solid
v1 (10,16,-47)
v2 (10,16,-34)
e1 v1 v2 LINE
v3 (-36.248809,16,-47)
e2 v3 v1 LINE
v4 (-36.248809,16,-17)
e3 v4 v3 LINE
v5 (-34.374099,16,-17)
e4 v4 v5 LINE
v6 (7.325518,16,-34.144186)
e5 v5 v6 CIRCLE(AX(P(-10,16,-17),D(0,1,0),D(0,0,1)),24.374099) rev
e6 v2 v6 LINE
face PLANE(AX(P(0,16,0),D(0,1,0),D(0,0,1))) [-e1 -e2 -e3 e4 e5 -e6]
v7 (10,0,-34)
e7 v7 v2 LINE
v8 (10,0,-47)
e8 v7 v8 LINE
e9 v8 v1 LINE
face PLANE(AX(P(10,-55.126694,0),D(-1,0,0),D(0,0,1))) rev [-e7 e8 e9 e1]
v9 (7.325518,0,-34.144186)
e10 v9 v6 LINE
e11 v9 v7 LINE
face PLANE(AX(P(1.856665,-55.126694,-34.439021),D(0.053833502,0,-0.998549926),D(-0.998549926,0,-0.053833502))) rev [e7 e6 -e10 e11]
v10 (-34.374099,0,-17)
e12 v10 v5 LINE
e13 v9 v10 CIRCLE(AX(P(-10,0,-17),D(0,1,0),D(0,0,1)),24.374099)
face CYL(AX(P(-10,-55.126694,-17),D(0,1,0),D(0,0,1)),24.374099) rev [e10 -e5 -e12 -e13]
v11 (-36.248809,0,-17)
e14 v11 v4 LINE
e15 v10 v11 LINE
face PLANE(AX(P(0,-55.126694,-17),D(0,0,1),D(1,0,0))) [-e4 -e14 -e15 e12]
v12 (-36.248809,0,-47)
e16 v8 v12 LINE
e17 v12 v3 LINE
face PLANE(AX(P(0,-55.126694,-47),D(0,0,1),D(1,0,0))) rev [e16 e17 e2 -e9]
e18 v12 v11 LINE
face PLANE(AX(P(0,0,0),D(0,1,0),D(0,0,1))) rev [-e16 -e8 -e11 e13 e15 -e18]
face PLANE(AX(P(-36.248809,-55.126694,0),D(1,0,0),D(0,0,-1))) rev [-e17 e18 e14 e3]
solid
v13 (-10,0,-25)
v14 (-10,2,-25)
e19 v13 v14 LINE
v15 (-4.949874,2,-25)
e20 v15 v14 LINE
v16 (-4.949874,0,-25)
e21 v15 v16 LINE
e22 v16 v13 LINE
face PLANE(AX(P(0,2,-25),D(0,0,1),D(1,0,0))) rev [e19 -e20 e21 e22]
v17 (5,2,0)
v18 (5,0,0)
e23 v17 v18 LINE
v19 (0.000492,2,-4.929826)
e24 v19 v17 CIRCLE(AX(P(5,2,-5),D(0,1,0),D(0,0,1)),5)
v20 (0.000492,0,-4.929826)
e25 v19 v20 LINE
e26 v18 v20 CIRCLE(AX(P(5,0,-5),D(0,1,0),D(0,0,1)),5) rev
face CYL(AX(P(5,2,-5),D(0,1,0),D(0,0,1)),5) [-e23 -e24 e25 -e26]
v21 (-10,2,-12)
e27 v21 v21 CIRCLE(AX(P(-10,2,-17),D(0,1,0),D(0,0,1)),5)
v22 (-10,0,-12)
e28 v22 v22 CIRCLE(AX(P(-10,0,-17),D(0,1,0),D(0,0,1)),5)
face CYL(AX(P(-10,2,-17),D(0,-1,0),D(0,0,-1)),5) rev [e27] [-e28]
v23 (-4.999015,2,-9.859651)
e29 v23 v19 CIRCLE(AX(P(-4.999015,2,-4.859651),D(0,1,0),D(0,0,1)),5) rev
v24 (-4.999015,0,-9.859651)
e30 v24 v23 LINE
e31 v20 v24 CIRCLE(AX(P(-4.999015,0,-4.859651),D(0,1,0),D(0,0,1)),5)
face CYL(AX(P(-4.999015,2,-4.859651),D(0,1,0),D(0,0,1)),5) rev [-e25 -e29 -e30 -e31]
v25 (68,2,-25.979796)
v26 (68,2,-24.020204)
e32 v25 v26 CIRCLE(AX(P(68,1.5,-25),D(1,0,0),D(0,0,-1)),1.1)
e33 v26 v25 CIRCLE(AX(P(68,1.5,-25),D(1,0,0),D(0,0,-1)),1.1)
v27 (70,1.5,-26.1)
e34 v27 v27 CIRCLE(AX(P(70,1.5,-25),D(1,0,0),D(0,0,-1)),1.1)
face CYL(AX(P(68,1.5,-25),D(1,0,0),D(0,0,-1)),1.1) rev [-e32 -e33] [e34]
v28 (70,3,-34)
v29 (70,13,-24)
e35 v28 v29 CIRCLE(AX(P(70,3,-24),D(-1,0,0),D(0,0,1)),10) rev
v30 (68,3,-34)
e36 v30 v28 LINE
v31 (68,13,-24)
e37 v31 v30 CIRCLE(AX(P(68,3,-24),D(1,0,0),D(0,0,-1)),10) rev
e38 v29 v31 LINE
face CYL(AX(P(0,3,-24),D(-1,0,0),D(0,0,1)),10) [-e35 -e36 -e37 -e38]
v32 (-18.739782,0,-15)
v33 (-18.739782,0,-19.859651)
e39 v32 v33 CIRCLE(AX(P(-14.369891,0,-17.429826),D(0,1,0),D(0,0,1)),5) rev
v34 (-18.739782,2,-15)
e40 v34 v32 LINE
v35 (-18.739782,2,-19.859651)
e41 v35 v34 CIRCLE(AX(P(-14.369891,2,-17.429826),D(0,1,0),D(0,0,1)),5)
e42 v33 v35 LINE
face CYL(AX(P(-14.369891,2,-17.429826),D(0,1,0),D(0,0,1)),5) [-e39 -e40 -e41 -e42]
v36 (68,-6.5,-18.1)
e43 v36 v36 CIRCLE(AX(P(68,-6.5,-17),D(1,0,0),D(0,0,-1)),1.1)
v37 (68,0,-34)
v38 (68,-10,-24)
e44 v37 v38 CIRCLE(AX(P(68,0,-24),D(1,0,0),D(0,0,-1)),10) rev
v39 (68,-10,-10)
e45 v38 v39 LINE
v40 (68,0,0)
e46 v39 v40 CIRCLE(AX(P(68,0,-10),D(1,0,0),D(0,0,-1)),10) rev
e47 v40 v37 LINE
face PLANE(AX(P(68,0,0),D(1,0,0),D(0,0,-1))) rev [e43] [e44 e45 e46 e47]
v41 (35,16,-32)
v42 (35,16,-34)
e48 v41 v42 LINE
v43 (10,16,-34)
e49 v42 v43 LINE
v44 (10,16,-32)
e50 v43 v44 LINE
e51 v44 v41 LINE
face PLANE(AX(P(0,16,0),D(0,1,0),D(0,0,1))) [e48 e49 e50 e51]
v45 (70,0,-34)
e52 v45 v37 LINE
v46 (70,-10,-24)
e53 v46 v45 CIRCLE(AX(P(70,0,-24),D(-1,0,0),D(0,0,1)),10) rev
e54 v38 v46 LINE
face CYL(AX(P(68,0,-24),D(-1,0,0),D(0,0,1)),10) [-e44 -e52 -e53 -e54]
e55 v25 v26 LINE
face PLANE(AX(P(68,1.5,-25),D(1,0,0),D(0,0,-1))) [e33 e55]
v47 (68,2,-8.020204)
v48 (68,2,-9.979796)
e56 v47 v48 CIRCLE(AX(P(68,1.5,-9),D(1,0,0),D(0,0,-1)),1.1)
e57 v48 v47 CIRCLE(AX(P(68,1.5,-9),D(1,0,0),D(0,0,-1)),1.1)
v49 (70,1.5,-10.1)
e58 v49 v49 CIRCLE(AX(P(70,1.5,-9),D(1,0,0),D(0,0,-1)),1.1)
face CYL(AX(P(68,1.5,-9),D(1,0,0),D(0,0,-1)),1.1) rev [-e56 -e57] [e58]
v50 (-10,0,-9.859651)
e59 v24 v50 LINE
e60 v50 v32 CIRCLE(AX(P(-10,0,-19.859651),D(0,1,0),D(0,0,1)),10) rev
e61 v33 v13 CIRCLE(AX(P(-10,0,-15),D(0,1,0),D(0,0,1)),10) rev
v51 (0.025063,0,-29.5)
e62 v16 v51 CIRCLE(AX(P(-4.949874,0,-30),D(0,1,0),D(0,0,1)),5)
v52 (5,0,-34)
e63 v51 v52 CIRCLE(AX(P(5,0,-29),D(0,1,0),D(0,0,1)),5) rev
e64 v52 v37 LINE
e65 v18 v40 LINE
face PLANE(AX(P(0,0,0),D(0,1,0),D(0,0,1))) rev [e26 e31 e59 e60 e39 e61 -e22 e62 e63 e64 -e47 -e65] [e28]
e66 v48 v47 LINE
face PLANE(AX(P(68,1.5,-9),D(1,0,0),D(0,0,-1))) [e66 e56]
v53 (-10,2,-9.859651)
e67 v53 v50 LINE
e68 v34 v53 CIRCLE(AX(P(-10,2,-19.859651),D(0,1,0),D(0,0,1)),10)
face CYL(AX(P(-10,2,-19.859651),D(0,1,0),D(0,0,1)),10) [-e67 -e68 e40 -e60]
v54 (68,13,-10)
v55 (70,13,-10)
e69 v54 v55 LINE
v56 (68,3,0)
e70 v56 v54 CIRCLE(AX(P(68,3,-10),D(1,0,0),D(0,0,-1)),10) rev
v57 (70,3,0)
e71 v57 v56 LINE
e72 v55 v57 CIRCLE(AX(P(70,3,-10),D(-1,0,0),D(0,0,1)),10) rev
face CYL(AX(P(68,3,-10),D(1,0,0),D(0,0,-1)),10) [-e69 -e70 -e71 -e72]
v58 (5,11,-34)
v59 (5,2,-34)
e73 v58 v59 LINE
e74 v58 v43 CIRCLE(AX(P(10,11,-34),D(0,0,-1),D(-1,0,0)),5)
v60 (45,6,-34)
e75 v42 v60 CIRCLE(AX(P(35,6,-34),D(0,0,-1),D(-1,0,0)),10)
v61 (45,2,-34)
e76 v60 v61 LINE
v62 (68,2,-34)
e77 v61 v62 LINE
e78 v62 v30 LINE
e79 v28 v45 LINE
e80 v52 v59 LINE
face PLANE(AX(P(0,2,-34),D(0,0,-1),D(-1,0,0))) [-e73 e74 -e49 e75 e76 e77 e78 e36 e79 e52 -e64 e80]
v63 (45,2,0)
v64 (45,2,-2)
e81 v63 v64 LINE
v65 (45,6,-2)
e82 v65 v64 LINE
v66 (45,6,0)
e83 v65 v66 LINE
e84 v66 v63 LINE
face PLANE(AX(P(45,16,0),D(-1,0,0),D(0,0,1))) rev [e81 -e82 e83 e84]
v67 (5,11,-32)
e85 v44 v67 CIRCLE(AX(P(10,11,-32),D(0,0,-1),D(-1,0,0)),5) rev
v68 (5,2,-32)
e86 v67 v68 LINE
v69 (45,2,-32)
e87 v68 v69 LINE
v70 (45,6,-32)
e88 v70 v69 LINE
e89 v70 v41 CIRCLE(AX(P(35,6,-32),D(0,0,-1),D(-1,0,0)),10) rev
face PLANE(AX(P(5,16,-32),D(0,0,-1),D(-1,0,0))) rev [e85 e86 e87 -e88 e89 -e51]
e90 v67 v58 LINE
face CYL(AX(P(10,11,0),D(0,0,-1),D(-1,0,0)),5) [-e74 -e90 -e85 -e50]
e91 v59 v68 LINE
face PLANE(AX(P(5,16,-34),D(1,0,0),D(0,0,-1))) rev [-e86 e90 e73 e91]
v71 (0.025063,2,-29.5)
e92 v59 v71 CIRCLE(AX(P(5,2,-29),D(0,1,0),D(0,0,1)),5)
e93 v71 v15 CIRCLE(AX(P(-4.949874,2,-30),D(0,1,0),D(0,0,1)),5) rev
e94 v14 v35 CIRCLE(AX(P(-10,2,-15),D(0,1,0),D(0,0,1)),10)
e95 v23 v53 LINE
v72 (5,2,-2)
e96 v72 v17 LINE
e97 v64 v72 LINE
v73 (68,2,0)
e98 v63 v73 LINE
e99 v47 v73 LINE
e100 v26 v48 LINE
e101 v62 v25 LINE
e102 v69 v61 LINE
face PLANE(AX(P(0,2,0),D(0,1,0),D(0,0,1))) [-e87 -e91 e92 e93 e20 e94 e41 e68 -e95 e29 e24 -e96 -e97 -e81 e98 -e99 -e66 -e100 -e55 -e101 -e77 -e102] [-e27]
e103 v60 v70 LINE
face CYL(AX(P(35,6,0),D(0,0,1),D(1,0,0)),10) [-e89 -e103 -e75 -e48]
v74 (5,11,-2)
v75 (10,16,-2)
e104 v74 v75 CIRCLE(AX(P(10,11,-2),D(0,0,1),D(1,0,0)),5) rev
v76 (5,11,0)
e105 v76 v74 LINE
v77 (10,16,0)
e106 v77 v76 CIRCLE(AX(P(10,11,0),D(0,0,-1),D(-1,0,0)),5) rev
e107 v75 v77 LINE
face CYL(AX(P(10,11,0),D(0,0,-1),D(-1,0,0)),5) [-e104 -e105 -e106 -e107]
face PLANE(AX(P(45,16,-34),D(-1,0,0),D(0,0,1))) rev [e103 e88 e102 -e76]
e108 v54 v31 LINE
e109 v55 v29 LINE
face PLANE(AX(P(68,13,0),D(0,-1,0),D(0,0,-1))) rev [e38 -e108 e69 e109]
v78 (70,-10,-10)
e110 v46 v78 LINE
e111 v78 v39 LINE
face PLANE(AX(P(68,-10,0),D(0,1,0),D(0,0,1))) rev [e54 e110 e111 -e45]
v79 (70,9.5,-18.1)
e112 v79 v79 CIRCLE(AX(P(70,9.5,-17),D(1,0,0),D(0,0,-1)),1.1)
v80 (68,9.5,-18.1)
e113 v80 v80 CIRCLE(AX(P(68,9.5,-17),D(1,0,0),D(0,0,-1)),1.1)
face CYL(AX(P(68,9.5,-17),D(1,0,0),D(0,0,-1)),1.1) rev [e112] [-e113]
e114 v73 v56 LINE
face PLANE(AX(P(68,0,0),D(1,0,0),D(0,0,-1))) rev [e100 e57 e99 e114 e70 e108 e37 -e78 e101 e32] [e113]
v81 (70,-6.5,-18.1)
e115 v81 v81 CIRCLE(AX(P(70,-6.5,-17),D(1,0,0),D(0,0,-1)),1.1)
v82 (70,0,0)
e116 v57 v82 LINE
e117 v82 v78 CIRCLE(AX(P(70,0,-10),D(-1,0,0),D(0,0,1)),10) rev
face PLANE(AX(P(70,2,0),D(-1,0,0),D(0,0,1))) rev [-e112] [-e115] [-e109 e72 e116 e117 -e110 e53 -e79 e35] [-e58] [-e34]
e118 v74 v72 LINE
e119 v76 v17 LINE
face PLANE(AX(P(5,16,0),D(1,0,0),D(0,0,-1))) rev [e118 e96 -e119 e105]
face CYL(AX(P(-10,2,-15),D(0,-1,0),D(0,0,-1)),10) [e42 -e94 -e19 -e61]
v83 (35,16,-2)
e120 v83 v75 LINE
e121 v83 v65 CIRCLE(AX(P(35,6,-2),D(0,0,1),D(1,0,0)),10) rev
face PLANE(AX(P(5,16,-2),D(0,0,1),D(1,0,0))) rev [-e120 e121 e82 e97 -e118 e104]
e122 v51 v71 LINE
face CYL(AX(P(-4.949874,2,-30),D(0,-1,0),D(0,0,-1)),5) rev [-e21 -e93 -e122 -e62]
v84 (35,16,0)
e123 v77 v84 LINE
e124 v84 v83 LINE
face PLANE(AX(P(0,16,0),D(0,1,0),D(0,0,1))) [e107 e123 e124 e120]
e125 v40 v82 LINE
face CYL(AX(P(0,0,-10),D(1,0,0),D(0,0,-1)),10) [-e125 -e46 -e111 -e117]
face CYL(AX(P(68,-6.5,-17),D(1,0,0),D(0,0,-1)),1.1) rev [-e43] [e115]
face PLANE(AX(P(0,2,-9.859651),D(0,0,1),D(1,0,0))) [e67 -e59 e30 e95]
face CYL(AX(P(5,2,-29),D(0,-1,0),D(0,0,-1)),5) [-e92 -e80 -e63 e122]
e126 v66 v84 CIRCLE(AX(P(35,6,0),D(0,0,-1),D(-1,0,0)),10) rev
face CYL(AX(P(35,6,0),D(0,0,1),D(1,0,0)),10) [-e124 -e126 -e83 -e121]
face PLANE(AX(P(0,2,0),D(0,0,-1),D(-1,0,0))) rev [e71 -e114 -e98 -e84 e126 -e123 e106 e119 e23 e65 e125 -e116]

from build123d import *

# Parameters (mm, degrees)
ESQUISSE1_W             = 70
ESQUISSE1_H             = 34
ESQUISSE1_W_2           = 20
ESQUISSE1_H_2           = 15.140348997
ESQUISSE1_R             = 5
BOSS_EXTRU_1_DEPTH      = 2
CONG_1_R                = 10
CONG_3_R                = 5
CONG_4_R                = 5
CONG_5_R                = 5
ESQUISSE2_W             = 40
ESQUISSE2_H             = 2
BOSS_EXTRU_2_DEPTH      = 14
CONG_6_R                = 5
CONG_7_R                = 10
BOSS_EXTRU_3_DEPTH      = 16
ESQUISSE5_W             = 34
ESQUISSE5_H             = 11
ESQUISSE5_H_2           = 10
BOSS_EXTRU_4_DEPTH      = 2
ESQUISSE7_R             = 1.1
ENL_V_MAT_EXTRU_1_DEPTH = 2
CONG_8_R                = 10


with BuildPart() as part:
    # Esquisse1 → Boss.-Extru.1 (new body)
    # profile 1 of 2: a face of its own
    with BuildSketch(Plane(origin=(0, 0, 0), x_dir=(1, 0, 0), z_dir=(0, 1, 0))):
        with Locations((35, 17)):
            Rectangle(ESQUISSE1_W, ESQUISSE1_H)
    # profile 2 of 2: a face of its own
    with BuildSketch(Plane(origin=(0, 0, 0), x_dir=(1, 0, 0), z_dir=(0, 1, 0))):
        with Locations((-10, 17.429825501)):
            Rectangle(ESQUISSE1_W_2, ESQUISSE1_H_2)
        with Locations(Location((-10, 17, 0), (0, 0, 270))):
            Circle(ESQUISSE1_R, mode=Mode.SUBTRACT)
    extrude(amount=BOSS_EXTRU_1_DEPTH)

    # Congé1
    # the kernel refuses this fillet: 10 mm, written as the material it takes off along each edge
    with BuildSketch(Plane(origin=(-20, -25, -25), x_dir=(0, 0, 1), z_dir=(0, 1, 0)), Plane(origin=(-20, -25, -9.859651003), x_dir=(1, 0, 0), z_dir=(0, 1, 0))) as cong_1_piece_1:
        with BuildLine():
            CenterArc((CONG_1_R, CONG_1_R), CONG_1_R, 180, 90)
            Line((0, CONG_1_R), (0, 0))
            Line((0, 0), (CONG_1_R, 0))
        make_face()
    extrude(amount=52, mode=Mode.SUBTRACT)

    # Congé3
    cong_3_edges = [part.edges().sort_by_distance(p)[0] for p in [
        (-19.700306595, 1, -17.429825502),
    ]]
    fillet(cong_3_edges, radius=CONG_3_R)

    # Congé4
    cong_4_edges = [part.edges().sort_by_distance(p)[0] for p in [
        (0, 1, -34),
        (0, 1, 0),
    ]]
    fillet(cong_4_edges, radius=CONG_4_R)

    # Congé5
    cong_5_edges = [part.edges().sort_by_distance(p)[0] for p in [
        (0, 1, -25),
        (0, 1, -9.859651003),
    ]]
    fillet(cong_5_edges, radius=CONG_5_R)

    # Esquisse2 → Boss.-Extru.2 (add)
    with BuildSketch(Plane(origin=(0, 2, 0), x_dir=(1, 0, 0), z_dir=(0, 1, 0))):
        with Locations((25, 1)):
            Rectangle(ESQUISSE2_W, ESQUISSE2_H)
        with Locations((25, 33)):
            Rectangle(ESQUISSE2_W, ESQUISSE2_H)
    extrude(amount=BOSS_EXTRU_2_DEPTH)

    # Congé6
    cong_6_edges = [part.edges().sort_by_distance(p)[0] for p in [
        (5, 16, -33),
        (5, 16, -1),
    ]]
    fillet(cong_6_edges, radius=CONG_6_R)

    # Congé7
    cong_7_edges = [part.edges().sort_by_distance(p)[0] for p in [
        (45, 16, -33),
        (45, 16, -1),
    ]]
    fillet(cong_7_edges, radius=CONG_7_R)

    # Esquisse5 → Boss.-Extru.4 (add)
    with BuildSketch(Plane(origin=(70, 0, 0), x_dir=(0, 0, -1), z_dir=(1, 0, 0))):
        with Locations((17, 7.5)):
            Rectangle(ESQUISSE5_W, ESQUISSE5_H)
        with Locations((17, -5)):
            Rectangle(ESQUISSE5_W, ESQUISSE5_H_2)
    extrude(amount=-BOSS_EXTRU_4_DEPTH)

    # Esquisse7 → Enlèv. mat.-Extru.1 (cut)
    with BuildSketch(Plane(origin=(70, 0, 0), x_dir=(0, 0, -1), z_dir=(1, 0, 0))):
        with Locations((25, 1.5)):
            Circle(ESQUISSE7_R)
        with Locations((17, -6.5)):
            Circle(ESQUISSE7_R)
        with Locations((9, 1.5)):
            Circle(ESQUISSE7_R)
        with Locations((17, 9.5)):
            Circle(ESQUISSE7_R)
    extrude(amount=-ENL_V_MAT_EXTRU_1_DEPTH, mode=Mode.SUBTRACT)

    # Congé8
    cong_8_edges = [part.edges().sort_by_distance(p)[0] for p in [
        (69, -10, 0),
        (69, -10, -34),
        (69, 13, -34),
        (69, 13, 0),
    ]]
    fillet(cong_8_edges, radius=CONG_8_R)


with BuildPart() as body_2:
    # Esquisse4 → Boss.-Extru.3 (new body)
    with BuildSketch(Plane(origin=(0, 16, 0), x_dir=(1, 0, 0), z_dir=(0, 1, 0))):
        with BuildLine():
            ThreePointArc((10, 34), (-19.05604246, 41.637128383), (-36.248809497, 17))
            Line((-36.248809497, 17), (-36.248809497, 47))
            Line((-36.248809497, 47), (10, 47))
            Line((10, 47), (10, 34))
        make_face()
        with BuildLine():
            Line((-36.248809497, 17), (-34.374098883, 17))
            ThreePointArc((-34.374098883, 17), (-19.268300711, 39.543187403), (7.325518463, 34.144185788))
            Line((7.325518463, 34.144185788), (10, 34))
            ThreePointArc((10, 34), (-19.05604246, 41.637128383), (-36.248809497, 17))
        make_face()
    extrude(amount=-BOSS_EXTRU_3_DEPTH)


solid = Compound([part.part, body_2.part])
